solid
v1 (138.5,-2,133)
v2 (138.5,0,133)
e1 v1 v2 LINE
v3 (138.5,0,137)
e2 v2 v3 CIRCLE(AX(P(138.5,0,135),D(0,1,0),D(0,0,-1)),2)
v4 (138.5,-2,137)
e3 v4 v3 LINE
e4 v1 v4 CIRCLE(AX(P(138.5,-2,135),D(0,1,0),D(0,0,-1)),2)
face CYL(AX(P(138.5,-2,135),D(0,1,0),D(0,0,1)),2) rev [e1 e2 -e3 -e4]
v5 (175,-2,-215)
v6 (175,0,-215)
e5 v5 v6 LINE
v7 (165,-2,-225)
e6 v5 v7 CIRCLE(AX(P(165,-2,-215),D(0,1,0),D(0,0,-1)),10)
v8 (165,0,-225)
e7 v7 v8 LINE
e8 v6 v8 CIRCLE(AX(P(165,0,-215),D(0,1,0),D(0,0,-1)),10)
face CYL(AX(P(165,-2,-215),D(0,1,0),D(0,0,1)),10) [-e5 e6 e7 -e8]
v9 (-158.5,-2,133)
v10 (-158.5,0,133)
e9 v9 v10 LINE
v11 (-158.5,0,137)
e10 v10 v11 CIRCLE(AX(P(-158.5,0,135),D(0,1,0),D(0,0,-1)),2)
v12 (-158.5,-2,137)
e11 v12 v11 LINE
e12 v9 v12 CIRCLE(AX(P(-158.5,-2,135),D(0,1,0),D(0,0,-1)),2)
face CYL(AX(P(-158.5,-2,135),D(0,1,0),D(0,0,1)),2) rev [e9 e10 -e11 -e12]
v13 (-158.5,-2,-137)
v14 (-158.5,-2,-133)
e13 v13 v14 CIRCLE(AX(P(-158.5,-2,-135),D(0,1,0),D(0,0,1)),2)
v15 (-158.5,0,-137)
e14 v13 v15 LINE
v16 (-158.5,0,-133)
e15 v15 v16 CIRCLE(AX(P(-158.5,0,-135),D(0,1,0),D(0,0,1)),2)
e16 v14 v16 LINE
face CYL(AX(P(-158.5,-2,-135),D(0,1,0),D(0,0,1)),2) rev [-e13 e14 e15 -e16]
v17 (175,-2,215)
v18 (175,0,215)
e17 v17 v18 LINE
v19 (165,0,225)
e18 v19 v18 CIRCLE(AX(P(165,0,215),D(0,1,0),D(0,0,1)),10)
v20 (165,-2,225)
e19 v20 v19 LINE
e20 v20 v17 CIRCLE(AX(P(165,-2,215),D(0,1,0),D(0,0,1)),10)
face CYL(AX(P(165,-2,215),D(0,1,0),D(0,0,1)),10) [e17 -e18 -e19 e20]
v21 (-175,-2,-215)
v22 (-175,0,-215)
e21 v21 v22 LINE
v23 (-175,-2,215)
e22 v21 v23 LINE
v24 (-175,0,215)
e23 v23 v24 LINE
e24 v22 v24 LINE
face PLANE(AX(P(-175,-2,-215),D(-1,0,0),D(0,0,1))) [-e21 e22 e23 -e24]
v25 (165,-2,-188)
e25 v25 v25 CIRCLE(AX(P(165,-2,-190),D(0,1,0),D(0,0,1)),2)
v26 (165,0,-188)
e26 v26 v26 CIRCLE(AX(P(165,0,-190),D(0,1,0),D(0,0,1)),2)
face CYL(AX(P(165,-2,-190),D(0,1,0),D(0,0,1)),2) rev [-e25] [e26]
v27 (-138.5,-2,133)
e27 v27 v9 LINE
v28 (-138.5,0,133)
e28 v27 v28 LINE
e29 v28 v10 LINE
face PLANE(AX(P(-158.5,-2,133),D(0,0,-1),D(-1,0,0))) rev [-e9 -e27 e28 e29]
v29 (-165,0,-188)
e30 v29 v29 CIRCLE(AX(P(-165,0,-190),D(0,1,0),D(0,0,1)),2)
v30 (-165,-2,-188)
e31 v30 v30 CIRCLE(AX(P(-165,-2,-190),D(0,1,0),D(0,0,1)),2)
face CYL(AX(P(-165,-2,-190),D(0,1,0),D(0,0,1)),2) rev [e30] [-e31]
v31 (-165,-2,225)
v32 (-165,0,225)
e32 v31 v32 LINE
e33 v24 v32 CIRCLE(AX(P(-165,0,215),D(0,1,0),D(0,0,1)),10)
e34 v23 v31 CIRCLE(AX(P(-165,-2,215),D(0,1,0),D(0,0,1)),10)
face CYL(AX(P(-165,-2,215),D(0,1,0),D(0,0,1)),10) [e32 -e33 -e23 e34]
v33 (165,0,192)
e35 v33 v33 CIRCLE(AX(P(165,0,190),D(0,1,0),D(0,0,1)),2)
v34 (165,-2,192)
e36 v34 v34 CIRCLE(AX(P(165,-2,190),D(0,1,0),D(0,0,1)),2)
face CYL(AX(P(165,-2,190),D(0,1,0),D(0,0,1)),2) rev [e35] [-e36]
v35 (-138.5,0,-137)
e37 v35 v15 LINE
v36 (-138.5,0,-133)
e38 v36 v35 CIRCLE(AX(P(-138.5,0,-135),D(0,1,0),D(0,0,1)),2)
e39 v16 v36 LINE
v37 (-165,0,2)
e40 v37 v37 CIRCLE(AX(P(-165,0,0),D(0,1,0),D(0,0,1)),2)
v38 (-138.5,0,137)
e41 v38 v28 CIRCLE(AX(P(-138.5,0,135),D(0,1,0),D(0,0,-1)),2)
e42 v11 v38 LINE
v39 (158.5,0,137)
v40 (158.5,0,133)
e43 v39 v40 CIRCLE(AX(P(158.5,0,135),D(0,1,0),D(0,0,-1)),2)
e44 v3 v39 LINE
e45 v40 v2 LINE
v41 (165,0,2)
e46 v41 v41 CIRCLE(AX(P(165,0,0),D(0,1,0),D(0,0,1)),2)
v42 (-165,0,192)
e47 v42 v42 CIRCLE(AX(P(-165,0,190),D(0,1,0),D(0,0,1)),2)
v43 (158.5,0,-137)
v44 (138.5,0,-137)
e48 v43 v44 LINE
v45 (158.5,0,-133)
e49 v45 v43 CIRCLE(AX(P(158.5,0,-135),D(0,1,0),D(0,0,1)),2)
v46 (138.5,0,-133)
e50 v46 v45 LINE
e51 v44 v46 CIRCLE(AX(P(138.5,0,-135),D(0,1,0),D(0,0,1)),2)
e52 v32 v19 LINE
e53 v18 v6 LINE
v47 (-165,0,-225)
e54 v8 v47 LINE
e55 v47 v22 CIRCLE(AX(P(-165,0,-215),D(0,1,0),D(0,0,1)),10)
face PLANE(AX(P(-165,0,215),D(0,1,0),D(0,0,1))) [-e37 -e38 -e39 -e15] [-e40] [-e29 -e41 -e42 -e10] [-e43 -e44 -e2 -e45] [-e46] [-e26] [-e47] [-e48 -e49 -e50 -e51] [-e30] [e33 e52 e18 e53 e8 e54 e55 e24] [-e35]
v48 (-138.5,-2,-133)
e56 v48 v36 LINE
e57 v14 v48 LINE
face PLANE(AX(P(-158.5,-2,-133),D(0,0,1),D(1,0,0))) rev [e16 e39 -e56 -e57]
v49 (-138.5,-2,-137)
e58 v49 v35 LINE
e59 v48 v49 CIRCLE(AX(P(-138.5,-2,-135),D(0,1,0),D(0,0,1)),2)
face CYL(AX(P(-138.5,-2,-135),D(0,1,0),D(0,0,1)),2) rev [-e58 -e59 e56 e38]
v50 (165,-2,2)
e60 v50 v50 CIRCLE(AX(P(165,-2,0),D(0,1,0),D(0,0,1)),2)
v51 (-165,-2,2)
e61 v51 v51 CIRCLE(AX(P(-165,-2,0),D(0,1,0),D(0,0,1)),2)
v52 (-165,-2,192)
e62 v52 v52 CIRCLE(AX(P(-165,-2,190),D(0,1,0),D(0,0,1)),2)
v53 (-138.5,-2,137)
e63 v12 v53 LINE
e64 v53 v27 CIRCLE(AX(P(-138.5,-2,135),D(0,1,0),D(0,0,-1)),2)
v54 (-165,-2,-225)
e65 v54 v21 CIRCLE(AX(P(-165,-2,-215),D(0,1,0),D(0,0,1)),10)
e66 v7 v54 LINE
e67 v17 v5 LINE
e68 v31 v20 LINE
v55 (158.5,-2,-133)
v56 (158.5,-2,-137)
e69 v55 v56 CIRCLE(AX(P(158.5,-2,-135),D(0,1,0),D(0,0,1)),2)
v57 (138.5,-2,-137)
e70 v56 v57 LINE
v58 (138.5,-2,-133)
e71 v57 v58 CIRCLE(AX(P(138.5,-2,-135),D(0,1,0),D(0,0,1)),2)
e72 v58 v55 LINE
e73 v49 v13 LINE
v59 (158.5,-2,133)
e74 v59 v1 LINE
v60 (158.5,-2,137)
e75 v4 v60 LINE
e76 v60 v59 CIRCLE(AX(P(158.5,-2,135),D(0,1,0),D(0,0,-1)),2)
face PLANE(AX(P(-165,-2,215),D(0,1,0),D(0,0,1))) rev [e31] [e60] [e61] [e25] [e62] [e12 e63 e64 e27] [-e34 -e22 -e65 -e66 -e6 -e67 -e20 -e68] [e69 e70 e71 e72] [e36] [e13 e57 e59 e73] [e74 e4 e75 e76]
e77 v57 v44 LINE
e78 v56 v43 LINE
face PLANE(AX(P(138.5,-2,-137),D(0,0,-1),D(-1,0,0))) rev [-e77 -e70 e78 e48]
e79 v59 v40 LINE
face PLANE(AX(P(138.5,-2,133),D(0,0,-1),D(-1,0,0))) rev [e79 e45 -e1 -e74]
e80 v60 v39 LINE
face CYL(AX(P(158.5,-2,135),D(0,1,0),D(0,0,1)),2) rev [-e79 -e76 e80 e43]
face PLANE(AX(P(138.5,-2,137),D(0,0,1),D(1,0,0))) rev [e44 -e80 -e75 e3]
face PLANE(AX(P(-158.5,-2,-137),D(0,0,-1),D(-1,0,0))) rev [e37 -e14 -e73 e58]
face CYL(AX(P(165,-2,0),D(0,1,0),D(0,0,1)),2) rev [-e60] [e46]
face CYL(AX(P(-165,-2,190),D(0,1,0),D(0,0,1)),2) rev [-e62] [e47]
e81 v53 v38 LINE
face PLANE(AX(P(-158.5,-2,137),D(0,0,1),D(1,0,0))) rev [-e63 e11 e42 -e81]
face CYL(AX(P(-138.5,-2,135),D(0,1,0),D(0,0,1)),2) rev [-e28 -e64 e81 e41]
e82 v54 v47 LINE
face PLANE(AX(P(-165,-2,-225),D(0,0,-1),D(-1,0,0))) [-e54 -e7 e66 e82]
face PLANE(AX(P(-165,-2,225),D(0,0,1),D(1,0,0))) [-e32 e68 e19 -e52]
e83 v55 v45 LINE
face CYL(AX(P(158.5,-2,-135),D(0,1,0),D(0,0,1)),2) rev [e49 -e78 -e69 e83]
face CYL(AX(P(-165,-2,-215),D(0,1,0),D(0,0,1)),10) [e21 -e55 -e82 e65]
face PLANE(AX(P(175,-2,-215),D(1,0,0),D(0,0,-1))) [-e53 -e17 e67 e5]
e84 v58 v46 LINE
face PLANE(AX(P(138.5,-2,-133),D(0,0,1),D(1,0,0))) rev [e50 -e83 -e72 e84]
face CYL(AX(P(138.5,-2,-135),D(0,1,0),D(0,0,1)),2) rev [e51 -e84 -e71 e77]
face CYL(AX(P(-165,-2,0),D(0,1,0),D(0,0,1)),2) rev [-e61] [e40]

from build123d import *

# Parameters (mm, degrees)
SKETCH_1_R             = 2
SM_BASE_FLANGE_1_DEPTH = 2


# Sheet-metal steps are written as plain solids
with BuildPart() as part:
    # Sketch 1 → 基体-法兰1 (new body)
    with BuildSketch(Plane(origin=(0, 0, 0), x_dir=(1, 0, 0), z_dir=(0, 1, 0))):
        with BuildLine():
            Line((-165, 225), (165, 225))
            ThreePointArc((165, 225), (172.071067812, 222.071067812), (175, 215))
            Line((175, 215), (175, -215))
            ThreePointArc((175, -215), (172.071067812, -222.071067812), (165, -225))
            Line((165, -225), (-165, -225))
            ThreePointArc((-165, -225), (-172.071067812, -222.071067812), (-175, -215))
            Line((-175, -215), (-175, 215))
            ThreePointArc((-175, 215), (-172.071067812, 222.071067812), (-165, 225))
        make_face()
        with Locations(Location((-165, 190, 0), (0, 0, 270))):
            Circle(SKETCH_1_R, mode=Mode.SUBTRACT)
        with Locations(Location((165, 190, 0), (0, 0, 270))):
            Circle(SKETCH_1_R, mode=Mode.SUBTRACT)
        with Locations(Location((165, 0, 0), (0, 0, 270))):
            Circle(SKETCH_1_R, mode=Mode.SUBTRACT)
        with Locations(Location((165, -190, 0), (0, 0, 270))):
            Circle(SKETCH_1_R, mode=Mode.SUBTRACT)
        with Locations(Location((-165, -190, 0), (0, 0, 270))):
            Circle(SKETCH_1_R, mode=Mode.SUBTRACT)
        with Locations(Location((-165, 0, 0), (0, 0, 270))):
            Circle(SKETCH_1_R, mode=Mode.SUBTRACT)
        with BuildLine():
            Line((-158.5, 137), (-138.5, 137))
            ThreePointArc((-138.5, 137), (-136.5, 135), (-138.5, 133))
            Line((-138.5, 133), (-158.5, 133))
            ThreePointArc((-158.5, 133), (-160.5, 135), (-158.5, 137))
        make_face(mode=Mode.SUBTRACT)
        with BuildLine():
            Line((138.5, 137), (158.5, 137))
            ThreePointArc((158.5, 137), (160.5, 135), (158.5, 133))
            Line((158.5, 133), (138.5, 133))
            ThreePointArc((138.5, 133), (136.5, 135), (138.5, 137))
        make_face(mode=Mode.SUBTRACT)
        with BuildLine():
            Line((-158.5, -137), (-138.5, -137))
            ThreePointArc((-138.5, -137), (-136.5, -135), (-138.5, -133))
            Line((-138.5, -133), (-158.5, -133))
            ThreePointArc((-158.5, -133), (-160.5, -135), (-158.5, -137))
        make_face(mode=Mode.SUBTRACT)
        with BuildLine():
            Line((138.5, -137), (158.5, -137))
            ThreePointArc((158.5, -137), (160.5, -135), (158.5, -133))
            Line((158.5, -133), (138.5, -133))
            ThreePointArc((138.5, -133), (136.5, -135), (138.5, -137))
        make_face(mode=Mode.SUBTRACT)
    extrude(amount=-SM_BASE_FLANGE_1_DEPTH)


solid = part.part
